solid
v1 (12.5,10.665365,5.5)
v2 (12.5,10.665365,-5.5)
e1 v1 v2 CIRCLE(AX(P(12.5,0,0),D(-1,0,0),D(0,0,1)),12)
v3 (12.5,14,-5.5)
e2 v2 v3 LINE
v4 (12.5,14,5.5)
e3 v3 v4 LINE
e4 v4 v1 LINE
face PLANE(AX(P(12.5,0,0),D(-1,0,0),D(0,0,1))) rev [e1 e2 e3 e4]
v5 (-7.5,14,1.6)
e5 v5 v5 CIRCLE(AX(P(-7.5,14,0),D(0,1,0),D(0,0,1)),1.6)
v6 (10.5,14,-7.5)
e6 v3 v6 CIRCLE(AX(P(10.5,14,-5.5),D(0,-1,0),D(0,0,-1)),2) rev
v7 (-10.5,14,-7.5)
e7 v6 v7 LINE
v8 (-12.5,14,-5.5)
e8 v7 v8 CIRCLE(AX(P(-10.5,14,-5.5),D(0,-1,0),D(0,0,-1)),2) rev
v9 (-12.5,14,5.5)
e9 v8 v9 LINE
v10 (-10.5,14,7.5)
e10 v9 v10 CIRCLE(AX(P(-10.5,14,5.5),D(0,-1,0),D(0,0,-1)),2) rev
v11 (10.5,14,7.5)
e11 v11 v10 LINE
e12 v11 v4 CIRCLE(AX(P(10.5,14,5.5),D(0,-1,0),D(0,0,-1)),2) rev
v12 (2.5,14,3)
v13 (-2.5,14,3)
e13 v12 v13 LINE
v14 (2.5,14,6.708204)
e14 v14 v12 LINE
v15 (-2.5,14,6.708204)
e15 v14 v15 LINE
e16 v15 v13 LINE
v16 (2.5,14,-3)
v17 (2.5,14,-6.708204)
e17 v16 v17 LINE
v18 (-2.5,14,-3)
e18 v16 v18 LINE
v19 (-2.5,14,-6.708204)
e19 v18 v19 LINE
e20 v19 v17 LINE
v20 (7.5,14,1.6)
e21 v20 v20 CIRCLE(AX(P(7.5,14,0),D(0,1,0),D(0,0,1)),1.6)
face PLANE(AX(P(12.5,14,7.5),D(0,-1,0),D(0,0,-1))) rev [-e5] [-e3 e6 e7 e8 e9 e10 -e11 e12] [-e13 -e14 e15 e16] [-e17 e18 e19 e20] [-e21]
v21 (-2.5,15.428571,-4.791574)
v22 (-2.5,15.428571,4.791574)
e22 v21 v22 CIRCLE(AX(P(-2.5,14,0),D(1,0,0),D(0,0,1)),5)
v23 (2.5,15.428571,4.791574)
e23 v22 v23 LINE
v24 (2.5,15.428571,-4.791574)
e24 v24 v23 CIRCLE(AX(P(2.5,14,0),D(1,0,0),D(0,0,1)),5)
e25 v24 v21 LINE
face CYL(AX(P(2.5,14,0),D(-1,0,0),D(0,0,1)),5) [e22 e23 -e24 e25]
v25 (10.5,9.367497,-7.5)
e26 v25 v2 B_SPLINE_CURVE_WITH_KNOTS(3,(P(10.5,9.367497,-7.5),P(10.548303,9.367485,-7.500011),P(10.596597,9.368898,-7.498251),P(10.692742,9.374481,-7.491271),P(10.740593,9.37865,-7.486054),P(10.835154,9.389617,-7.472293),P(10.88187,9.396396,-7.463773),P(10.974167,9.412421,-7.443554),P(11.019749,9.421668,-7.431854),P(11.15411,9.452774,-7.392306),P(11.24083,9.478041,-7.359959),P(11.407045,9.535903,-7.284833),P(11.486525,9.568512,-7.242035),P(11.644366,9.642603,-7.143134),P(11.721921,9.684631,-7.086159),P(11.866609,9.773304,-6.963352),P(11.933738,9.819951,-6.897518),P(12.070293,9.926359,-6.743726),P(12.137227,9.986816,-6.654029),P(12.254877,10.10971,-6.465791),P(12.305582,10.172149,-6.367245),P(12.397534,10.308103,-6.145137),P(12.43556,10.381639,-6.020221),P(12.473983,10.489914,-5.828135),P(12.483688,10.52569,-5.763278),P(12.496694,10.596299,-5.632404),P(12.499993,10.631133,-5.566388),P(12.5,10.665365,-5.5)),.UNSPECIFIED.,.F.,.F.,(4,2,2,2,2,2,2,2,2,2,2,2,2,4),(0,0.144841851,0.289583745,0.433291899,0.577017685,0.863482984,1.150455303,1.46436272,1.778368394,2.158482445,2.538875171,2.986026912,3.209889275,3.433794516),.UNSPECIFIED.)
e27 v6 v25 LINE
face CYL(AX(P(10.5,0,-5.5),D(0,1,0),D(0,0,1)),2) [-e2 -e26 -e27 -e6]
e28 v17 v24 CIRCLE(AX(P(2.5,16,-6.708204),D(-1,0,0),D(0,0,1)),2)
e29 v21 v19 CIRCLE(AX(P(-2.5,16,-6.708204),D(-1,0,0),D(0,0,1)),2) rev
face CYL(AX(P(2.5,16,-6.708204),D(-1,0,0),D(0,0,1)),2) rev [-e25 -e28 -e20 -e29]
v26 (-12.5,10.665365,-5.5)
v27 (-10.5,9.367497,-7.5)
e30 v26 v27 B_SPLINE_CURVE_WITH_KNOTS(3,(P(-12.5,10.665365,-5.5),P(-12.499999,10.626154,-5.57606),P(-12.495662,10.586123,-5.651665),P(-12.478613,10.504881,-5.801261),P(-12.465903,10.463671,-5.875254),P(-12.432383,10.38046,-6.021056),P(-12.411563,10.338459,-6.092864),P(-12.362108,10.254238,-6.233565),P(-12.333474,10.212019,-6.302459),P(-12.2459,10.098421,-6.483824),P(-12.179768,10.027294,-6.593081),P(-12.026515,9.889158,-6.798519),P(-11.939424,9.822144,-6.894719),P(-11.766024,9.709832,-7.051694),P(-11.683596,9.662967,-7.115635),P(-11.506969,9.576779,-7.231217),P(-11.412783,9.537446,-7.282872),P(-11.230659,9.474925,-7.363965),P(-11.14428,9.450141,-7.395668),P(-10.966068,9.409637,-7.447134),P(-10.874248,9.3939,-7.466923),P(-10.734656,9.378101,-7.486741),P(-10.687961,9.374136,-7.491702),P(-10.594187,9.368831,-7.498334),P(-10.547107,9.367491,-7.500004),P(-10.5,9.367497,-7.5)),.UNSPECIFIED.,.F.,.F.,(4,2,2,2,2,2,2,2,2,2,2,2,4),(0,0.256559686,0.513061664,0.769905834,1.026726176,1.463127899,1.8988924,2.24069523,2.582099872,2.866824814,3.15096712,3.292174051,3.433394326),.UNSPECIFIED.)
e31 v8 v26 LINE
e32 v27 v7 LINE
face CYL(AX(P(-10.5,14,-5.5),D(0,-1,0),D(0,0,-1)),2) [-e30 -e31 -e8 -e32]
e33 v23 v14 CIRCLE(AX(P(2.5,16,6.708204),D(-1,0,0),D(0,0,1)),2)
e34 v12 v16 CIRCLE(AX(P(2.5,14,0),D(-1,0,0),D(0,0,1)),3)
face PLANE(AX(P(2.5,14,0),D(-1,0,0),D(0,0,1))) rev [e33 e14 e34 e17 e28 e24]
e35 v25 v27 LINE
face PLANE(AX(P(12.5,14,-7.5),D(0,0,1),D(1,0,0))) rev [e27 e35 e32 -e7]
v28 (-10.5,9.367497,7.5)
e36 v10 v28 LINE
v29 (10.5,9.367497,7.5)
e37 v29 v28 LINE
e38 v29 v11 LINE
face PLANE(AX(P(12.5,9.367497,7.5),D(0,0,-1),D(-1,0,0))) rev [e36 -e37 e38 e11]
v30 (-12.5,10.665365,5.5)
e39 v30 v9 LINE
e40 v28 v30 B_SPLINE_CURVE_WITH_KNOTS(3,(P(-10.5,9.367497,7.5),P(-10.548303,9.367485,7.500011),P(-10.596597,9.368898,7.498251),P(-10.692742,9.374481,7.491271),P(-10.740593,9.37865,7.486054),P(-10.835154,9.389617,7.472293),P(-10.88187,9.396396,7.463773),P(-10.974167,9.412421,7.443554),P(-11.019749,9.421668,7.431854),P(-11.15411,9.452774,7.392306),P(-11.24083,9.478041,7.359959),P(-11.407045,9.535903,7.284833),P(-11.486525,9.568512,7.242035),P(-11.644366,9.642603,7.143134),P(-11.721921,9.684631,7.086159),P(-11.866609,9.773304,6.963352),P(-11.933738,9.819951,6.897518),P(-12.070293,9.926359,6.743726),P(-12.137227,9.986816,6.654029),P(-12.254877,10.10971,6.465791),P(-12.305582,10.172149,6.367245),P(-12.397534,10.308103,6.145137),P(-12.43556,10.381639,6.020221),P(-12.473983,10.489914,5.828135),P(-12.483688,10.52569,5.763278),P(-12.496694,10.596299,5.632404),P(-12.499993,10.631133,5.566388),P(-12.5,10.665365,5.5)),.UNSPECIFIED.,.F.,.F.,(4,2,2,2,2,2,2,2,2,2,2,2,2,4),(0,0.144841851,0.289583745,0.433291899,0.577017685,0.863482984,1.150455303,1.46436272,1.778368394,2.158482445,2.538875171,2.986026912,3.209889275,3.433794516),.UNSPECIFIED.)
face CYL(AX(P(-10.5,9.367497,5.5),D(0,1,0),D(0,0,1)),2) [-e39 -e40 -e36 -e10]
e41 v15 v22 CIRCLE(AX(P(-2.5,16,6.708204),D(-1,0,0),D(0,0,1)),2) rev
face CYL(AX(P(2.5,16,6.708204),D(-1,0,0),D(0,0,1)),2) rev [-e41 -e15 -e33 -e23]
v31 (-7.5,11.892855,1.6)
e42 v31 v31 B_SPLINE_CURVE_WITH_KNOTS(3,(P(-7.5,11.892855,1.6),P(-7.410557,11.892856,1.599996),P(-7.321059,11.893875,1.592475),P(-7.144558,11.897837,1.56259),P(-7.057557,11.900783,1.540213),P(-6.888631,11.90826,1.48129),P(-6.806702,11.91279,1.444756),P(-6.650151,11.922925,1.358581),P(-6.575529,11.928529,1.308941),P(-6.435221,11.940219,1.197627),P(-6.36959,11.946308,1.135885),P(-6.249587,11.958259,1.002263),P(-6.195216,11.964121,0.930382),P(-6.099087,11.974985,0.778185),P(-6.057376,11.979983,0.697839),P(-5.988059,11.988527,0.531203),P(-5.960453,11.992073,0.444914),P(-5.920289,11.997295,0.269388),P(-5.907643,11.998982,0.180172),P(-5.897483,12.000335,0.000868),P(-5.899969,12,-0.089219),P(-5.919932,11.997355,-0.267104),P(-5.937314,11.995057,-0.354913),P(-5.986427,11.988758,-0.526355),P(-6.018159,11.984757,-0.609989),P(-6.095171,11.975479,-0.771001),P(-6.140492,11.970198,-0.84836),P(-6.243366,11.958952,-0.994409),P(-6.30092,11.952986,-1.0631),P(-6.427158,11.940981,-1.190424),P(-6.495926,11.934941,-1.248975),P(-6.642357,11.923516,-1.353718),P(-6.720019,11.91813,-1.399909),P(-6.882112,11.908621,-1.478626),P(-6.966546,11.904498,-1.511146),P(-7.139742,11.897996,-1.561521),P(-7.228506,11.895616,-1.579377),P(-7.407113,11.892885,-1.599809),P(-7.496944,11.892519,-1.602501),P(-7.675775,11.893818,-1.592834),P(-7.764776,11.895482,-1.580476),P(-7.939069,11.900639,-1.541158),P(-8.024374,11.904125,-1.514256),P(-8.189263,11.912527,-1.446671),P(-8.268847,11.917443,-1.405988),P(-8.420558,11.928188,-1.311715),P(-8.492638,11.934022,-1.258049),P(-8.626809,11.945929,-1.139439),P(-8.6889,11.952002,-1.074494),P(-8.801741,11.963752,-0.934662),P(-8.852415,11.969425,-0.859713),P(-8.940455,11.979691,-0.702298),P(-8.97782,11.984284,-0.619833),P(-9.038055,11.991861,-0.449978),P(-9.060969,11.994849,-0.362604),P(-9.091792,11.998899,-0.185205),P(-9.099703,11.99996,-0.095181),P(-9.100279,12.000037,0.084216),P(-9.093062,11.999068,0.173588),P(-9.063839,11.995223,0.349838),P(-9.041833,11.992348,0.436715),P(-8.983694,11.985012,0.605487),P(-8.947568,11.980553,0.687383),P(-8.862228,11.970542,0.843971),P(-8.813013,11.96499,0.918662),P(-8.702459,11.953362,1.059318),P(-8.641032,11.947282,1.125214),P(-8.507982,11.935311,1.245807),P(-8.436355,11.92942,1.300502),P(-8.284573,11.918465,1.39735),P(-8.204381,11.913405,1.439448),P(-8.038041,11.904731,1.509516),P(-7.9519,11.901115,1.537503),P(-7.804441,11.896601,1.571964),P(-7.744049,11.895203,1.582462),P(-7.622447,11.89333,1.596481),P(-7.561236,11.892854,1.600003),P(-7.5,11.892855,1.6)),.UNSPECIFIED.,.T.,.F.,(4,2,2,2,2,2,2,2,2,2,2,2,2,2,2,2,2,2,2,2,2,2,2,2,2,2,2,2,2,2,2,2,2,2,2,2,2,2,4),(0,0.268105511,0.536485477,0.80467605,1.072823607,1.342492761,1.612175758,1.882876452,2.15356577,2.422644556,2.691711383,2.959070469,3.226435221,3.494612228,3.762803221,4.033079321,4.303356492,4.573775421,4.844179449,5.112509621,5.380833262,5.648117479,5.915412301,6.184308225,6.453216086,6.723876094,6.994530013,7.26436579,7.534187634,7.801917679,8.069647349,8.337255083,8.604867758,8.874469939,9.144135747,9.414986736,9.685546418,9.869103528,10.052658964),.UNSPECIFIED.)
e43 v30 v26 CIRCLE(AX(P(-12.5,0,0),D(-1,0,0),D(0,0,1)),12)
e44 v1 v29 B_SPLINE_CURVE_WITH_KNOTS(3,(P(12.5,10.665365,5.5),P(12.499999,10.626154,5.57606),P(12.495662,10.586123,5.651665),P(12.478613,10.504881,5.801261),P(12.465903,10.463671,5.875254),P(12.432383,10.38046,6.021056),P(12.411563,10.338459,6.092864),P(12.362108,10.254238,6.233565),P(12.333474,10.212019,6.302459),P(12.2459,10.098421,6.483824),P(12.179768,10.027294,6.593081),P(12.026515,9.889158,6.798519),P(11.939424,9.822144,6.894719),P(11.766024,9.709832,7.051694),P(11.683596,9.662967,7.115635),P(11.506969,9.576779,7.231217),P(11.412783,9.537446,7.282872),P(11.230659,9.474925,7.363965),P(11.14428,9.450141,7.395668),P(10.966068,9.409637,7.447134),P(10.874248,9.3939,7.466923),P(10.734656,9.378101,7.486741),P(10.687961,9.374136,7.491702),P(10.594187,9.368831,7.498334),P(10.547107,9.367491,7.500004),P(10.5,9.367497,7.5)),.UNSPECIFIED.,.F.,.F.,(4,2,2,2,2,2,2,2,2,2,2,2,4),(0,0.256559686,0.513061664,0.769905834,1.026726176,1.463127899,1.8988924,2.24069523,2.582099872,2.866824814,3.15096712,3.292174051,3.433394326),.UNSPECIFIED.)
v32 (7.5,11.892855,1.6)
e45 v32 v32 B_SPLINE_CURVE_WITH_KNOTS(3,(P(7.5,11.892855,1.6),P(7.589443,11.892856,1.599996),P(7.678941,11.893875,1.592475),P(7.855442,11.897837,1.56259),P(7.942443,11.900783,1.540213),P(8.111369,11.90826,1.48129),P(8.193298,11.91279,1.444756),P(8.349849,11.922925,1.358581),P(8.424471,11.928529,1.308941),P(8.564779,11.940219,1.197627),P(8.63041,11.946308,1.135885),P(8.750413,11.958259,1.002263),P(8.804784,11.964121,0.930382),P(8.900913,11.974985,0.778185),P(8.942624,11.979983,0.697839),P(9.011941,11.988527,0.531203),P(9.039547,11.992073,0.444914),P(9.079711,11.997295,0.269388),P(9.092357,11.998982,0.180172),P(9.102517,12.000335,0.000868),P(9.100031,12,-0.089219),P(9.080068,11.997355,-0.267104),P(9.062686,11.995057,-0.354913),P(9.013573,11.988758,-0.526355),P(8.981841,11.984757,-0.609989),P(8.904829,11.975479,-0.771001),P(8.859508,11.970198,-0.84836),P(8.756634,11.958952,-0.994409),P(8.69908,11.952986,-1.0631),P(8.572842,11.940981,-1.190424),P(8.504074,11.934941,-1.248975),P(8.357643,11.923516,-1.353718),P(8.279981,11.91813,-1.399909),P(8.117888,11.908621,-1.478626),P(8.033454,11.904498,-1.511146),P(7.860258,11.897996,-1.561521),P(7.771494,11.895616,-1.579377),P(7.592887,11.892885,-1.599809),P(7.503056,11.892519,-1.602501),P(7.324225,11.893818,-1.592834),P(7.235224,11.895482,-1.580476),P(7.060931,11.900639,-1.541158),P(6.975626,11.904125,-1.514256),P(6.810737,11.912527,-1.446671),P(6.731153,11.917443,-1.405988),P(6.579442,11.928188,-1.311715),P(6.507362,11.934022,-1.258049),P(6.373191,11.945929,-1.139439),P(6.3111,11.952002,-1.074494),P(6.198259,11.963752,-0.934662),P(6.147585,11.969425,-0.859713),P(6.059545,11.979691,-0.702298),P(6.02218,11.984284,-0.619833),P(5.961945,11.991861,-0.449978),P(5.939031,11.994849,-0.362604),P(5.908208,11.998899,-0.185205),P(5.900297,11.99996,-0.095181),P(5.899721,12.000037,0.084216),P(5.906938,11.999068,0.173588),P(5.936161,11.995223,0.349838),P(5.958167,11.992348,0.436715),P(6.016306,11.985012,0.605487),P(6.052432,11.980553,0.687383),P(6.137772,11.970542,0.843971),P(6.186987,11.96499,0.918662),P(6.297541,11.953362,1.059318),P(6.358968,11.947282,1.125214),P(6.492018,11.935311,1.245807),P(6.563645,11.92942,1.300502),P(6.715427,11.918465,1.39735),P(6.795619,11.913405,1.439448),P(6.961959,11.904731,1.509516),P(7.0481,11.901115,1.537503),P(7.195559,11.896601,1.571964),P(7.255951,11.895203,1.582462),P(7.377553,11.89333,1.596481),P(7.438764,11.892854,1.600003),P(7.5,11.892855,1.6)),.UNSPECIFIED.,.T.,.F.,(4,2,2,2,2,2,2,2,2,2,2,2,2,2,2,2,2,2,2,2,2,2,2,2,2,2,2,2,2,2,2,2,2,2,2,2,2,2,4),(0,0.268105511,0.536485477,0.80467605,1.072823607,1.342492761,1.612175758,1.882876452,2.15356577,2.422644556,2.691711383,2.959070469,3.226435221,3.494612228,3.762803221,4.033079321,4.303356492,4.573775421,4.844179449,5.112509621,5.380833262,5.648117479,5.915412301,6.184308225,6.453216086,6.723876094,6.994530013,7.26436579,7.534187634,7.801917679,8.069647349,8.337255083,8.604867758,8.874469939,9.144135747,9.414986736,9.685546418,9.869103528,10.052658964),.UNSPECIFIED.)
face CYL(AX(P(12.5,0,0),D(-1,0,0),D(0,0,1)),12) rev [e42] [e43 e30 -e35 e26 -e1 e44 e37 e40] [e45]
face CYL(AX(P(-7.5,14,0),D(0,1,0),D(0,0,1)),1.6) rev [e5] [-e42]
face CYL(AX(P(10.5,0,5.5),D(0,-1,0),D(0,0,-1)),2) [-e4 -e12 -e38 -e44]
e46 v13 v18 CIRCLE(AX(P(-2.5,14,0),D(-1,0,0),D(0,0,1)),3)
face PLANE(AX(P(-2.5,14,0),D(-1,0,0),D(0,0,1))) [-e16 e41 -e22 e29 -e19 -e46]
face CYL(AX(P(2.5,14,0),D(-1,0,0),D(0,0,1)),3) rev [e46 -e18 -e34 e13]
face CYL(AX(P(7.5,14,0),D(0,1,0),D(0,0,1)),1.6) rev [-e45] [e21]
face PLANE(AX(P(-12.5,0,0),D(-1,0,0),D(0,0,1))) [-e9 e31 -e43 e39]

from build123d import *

# Parameters (mm, degrees)
BOSS_EXTRUDE1_DEPTH  = 12.5
BOSS_EXTRUDE2_DEPTH  = 2.5
FILLET1_R            = 2
M3_CLEARANCE_HOLE1_D = 3.2


with BuildPart() as part:
    # Sketch1 → Boss-Extrude1 (new, symmetric)
    with BuildSketch(Plane(origin=(0, 0, 0), x_dir=(0, 0, -1), z_dir=(1, 0, 0))):
        with BuildLine():
            Line((-7.5, 9.367496998), (-7.5, 14))
            Line((-7.5, 14), (7.5, 14))
            Line((7.5, 14), (7.5, 9.367496998))
            ThreePointArc((7.5, 9.367496998), (0, 12), (-7.5, 9.367496998))
        make_face()
    extrude(amount=BOSS_EXTRUDE1_DEPTH, both=True)

    # Sketch2 → Boss-Extrude2 (add, symmetric)
    with BuildSketch(Plane(origin=(0, 0, 0), x_dir=(0, 0, -1), z_dir=(1, 0, 0))):
        with BuildLine():
            Line((-5, 14), (-3, 14))
            ThreePointArc((-3, 14), (0, 17), (3, 14))
            Line((3, 14), (5, 14))
            ThreePointArc((5, 14), (0, 19), (-5, 14))
        make_face()
    extrude(amount=BOSS_EXTRUDE2_DEPTH, both=True)

    # Fillet1
    fillet1_edges = [part.edges().sort_by_distance(p)[0] for p in [
        (0, 14, -5),
        (0, 14, 5),
    ]]
    fillet(fillet1_edges, radius=FILLET1_R)
    fillet1_2_edges = [part.edges().sort_by_distance(p)[0] for p in [
        (12.5, 11.683748499, 7.5),
        (-12.5, 11.683748499, 7.5),
        (-12.5, 11.683748499, -7.5),
        (12.5, 11.683748499, -7.5),
    ]]
    fillet(fillet1_2_edges, radius=FILLET1_R)

    # M3 Clearance Hole1 (through all)
    with Locations(Plane(origin=(0, 14, 0), x_dir=(1, 0, 0), z_dir=(0, 1, 0))):
        with Locations((-7.5, 0), (7.5, 0)):
            Hole(M3_CLEARANCE_HOLE1_D / 2)


solid = part.part
